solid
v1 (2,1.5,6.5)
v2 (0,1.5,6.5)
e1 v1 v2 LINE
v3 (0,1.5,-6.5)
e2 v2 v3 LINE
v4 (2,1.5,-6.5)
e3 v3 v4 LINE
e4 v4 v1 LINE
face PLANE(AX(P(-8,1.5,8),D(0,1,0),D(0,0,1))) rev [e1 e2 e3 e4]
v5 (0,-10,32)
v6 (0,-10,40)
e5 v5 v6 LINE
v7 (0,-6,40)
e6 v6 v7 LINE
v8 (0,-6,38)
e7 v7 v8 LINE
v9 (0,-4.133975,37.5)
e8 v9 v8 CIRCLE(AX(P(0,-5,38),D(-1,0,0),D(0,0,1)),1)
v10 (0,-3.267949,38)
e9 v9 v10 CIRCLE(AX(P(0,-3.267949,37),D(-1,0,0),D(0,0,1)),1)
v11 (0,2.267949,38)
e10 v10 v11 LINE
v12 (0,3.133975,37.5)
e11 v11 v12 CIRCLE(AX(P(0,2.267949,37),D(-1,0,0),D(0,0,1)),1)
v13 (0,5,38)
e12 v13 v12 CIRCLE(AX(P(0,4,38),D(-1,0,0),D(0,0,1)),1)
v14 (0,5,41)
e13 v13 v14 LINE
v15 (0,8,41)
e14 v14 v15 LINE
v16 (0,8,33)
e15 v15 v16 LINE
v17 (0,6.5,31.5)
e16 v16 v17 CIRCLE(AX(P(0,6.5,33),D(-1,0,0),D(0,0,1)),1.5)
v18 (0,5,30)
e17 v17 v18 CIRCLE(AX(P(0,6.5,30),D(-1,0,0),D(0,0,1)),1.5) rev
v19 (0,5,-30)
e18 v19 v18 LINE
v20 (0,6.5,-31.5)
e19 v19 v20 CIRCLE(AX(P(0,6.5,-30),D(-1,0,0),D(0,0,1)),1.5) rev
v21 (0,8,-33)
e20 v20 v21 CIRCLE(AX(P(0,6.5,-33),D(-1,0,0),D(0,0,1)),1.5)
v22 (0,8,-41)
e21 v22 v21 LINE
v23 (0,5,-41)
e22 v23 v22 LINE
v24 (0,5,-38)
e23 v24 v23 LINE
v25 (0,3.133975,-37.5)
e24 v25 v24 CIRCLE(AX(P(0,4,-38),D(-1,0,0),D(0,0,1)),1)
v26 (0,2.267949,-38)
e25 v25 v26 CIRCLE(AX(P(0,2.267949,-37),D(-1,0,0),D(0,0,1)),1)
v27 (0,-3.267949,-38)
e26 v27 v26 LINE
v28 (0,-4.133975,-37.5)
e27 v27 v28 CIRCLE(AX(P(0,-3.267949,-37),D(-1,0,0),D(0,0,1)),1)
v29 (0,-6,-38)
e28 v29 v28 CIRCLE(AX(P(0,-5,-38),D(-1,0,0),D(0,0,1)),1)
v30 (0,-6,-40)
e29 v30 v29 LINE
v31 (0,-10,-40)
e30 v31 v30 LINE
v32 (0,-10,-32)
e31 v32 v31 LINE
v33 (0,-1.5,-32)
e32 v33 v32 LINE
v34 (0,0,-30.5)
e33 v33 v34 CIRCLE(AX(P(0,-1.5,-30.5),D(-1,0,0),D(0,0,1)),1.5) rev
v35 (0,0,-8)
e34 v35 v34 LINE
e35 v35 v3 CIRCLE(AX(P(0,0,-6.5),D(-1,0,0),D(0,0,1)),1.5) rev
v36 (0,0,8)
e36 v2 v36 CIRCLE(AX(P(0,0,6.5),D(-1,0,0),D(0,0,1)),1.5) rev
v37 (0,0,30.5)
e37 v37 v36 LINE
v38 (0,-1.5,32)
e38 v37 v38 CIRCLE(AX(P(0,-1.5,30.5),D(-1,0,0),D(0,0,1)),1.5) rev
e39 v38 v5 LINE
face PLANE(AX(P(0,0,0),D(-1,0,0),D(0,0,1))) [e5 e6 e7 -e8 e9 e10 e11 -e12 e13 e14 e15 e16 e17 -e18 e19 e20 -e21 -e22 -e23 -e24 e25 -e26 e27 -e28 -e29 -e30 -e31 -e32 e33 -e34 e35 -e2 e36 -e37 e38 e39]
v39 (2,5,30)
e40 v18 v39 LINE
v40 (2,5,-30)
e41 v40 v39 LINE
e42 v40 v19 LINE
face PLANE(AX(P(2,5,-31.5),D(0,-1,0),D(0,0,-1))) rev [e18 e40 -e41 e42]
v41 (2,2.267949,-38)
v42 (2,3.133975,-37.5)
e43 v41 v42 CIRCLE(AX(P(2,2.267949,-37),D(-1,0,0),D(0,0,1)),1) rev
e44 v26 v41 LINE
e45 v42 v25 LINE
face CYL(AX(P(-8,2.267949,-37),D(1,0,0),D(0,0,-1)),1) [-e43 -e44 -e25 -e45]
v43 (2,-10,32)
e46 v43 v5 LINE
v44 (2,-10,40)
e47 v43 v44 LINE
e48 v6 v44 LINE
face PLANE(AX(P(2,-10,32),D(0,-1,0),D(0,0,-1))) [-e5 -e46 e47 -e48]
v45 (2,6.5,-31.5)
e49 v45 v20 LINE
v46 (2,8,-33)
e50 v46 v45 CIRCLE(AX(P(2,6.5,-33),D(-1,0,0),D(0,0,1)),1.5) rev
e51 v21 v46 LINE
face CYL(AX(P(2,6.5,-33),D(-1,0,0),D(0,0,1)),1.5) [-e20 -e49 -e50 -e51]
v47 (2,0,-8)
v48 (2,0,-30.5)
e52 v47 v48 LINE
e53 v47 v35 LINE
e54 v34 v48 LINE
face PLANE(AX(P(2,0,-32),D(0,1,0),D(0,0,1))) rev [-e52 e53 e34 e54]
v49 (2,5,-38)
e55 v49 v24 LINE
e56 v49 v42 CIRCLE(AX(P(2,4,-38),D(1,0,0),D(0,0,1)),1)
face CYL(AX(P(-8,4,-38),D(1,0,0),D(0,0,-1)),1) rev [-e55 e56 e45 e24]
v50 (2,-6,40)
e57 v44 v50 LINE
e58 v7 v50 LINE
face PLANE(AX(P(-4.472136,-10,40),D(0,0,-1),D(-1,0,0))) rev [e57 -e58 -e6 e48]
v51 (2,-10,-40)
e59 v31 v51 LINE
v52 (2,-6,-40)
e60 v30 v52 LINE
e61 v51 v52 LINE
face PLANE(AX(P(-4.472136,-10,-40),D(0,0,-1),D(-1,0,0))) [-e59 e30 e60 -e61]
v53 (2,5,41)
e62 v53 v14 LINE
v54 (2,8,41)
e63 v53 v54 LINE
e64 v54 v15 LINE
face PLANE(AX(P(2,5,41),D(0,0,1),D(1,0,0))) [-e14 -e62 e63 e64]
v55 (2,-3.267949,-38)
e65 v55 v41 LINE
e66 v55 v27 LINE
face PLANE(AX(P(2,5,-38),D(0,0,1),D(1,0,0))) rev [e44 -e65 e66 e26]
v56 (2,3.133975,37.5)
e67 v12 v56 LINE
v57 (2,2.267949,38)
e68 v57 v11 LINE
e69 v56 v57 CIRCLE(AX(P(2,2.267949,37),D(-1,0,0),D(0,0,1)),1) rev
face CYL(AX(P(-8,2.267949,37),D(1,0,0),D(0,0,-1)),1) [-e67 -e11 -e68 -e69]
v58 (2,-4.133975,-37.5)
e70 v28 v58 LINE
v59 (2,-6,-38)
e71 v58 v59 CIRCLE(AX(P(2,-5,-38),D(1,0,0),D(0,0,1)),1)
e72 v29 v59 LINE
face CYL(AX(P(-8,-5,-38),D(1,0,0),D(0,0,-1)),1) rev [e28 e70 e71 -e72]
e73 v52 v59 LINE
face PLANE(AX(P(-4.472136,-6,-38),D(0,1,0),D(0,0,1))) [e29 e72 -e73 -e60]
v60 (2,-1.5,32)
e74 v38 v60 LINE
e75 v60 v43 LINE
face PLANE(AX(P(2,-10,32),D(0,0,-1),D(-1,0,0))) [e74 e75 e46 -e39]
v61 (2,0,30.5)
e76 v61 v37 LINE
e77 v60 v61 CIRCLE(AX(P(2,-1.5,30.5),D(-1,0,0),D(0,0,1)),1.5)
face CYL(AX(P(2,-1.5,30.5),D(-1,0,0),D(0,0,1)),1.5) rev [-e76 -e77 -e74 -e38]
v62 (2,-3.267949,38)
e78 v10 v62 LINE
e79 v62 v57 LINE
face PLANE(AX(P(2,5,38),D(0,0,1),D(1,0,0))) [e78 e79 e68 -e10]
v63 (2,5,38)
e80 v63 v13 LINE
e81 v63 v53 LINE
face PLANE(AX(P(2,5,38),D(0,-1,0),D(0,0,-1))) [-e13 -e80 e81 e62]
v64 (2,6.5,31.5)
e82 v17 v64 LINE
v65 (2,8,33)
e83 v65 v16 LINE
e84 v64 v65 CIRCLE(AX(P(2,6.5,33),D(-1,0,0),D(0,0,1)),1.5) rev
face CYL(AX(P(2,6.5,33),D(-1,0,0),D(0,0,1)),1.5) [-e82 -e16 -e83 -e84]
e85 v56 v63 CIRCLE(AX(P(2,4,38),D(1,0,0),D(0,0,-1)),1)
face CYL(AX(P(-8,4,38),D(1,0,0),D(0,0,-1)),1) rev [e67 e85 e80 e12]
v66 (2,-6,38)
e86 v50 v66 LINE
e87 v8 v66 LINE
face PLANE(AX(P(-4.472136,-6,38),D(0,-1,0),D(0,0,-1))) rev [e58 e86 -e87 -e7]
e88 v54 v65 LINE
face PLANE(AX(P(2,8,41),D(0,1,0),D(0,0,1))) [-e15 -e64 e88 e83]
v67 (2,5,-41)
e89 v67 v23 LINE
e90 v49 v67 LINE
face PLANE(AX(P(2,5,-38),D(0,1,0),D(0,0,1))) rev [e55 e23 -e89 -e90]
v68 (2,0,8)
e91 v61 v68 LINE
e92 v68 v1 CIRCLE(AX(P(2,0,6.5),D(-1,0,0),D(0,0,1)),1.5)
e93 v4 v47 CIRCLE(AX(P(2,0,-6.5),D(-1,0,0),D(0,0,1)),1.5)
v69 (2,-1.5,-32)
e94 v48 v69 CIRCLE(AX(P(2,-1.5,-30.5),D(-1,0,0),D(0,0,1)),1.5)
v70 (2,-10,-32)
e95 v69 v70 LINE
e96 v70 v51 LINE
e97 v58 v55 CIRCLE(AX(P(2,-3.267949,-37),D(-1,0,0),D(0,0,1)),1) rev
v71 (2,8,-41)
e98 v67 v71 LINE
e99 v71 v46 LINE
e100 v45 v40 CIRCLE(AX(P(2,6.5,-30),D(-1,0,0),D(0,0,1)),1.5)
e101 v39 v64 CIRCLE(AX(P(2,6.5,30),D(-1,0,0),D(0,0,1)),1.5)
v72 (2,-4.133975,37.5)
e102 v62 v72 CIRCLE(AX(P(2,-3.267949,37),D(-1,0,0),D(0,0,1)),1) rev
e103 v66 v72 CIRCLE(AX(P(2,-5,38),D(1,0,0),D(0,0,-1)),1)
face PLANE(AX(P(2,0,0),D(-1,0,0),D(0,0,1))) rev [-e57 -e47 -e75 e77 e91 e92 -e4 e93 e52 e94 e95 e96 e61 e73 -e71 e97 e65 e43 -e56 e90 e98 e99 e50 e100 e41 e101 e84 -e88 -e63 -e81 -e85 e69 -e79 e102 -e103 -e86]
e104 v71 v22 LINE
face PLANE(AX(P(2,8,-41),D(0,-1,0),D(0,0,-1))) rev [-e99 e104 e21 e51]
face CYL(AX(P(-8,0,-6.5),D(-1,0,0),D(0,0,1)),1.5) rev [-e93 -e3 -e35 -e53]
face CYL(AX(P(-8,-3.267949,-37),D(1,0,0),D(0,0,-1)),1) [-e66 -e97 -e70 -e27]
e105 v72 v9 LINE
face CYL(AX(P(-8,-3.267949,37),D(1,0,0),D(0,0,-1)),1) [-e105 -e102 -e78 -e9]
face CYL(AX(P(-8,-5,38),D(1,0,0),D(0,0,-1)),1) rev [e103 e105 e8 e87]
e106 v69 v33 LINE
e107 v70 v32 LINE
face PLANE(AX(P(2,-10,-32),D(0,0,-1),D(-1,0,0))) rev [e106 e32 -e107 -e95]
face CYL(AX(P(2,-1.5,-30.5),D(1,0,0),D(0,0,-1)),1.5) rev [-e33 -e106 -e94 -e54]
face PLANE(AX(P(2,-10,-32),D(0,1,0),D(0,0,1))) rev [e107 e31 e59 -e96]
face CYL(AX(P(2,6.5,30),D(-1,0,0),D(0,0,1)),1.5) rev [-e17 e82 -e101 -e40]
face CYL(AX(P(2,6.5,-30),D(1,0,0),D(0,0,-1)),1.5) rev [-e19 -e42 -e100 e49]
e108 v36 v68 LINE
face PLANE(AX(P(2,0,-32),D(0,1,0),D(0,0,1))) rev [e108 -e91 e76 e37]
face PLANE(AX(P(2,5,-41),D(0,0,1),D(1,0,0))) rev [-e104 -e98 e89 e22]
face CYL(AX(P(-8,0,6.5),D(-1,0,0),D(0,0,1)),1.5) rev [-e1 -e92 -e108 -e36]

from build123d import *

# Parameters (mm, degrees)
EXTRUDE_1_DEPTH     = 2
SKETCH_3_W          = 2
SKETCH_3_H          = 4
EXTRUDE_2_DEPTH     = 2
SKETCH_4_W          = 16
SKETCH_4_H          = 3
CUT_EXTRUDE_1_DEPTH = 10
FILLET_1_R          = 1.5
SKETCH_5_R          = 1
CUT_EXTRUDE_2_DEPTH = 10
FILLET_2_R          = 1
FILLET_3_R          = 1.5


# Some blends are built 0.0001 mm under size
with BuildPart() as part:
    # 草图1 → 凸台-拉伸1 (new body)
    with BuildSketch(Plane(origin=(0, 0, 0), x_dir=(0, 0, -1), z_dir=(1, 0, 0))):
        Polygon((32, -10), (32, 0), (0, 0), (0, 5), (31.5, 5), (31.5, 8), (41, 8), (41, 5), (38, 5), (38, -10), align=None)
    extrude_1 = extrude(amount=EXTRUDE_1_DEPTH)

    # 草图3 → 凸台-拉伸2 (add)
    with BuildSketch(Plane(origin=(2, 0, 0), x_dir=(0, 0, -1), z_dir=(1, 0, 0))):
        with Locations((39, -8)):
            Rectangle(SKETCH_3_W, SKETCH_3_H)
    extrude_2 = extrude(amount=-EXTRUDE_2_DEPTH)

    # 镜向1: 凸台-拉伸1, 凸台-拉伸2 across plane
    add(extrude_1.mirror(Plane.XY))
    add(extrude_2.mirror(Plane.XY))

    # 草图4 → 切除-拉伸1 (cut)
    with BuildSketch(Plane(origin=(2, 0, 0), x_dir=(0, 0, -1), z_dir=(1, 0, 0))):
        Rectangle(SKETCH_4_W, SKETCH_4_H)
    extrude(amount=-CUT_EXTRUDE_1_DEPTH, mode=Mode.SUBTRACT)

    # 圆角1
    fillet_1_edges = [part.edges().sort_by_distance(p)[0] for p in [
        (1, 1.5, -8),
        (1, 1.5, 8),
    ]]
    fillet(fillet_1_edges, radius=FILLET_1_R - 0.0001)  # a hair under: the kernel refuses the full size

    # 草图5 → 切除-拉伸2 (cut)
    with BuildSketch(Plane(origin=(2, 0, 0), x_dir=(0, 0, -1), z_dir=(1, 0, 0))):
        with Locations((-38, 4)):
            Circle(SKETCH_5_R)
        with Locations((-38, -5)):
            Circle(SKETCH_5_R)
        with Locations((38, -5)):
            Circle(SKETCH_5_R)
        with Locations((38, 4)):
            Circle(SKETCH_5_R)
    extrude(amount=-CUT_EXTRUDE_2_DEPTH, mode=Mode.SUBTRACT)

    # 圆角2
    fillet_2_edges = [part.edges().sort_by_distance(p)[0] for p in [
        (1, 3, -38),
        (1, -4, -38),
        (1, -4, 38),
        (1, 3, 38),
    ]]
    fillet(fillet_2_edges, radius=FILLET_2_R)

    # 圆角3
    # the kernel refuses this fillet: 1.5 mm, written as the material it adds along each edge
    with BuildSketch(Plane(origin=(0, 0, 32), x_dir=(0, -1, 0), z_dir=(1, 0, 0)), Plane(origin=(0, 0, -32), x_dir=(0, 0, 1), z_dir=(1, 0, 0))) as fillet_3_piece_1:
        with BuildLine():
            CenterArc((FILLET_3_R, FILLET_3_R), FILLET_3_R, 180, 90)
            Line((0, FILLET_3_R), (0, 0))
            Line((0, 0), (FILLET_3_R, 0))
        make_face()
    extrude(amount=2)
    with BuildSketch(Plane(origin=(0, 5, -31.5), x_dir=(0, 0, 1), z_dir=(1, 0, 0)), Plane(origin=(0, 5, 31.5), x_dir=(0, 1, 0), z_dir=(1, 0, 0))) as fillet_3_piece_2:
        with BuildLine():
            CenterArc((FILLET_3_R, -FILLET_3_R), FILLET_3_R, 90, 90)
            Line((0, -FILLET_3_R), (0, 0))
            Line((0, 0), (FILLET_3_R, 0))
        make_face()
    extrude(amount=2)
    # the kernel refuses this fillet: 1.5 mm, written as the material it takes off along each edge
    with BuildSketch(Plane(origin=(-3.75, 8, -31.5), x_dir=(0, -1, 0), z_dir=(1, 0, 0)), Plane(origin=(-3.75, 8, 31.5), x_dir=(0, 0, 1), z_dir=(1, 0, 0))) as fillet_3_2_piece_1:
        with BuildLine():
            CenterArc((FILLET_3_R, FILLET_3_R), FILLET_3_R, 180, 90)
            Line((0, FILLET_3_R), (0, 0))
            Line((0, 0), (FILLET_3_R, 0))
        make_face()
    extrude(amount=9.5, mode=Mode.SUBTRACT)


solid = part.part
